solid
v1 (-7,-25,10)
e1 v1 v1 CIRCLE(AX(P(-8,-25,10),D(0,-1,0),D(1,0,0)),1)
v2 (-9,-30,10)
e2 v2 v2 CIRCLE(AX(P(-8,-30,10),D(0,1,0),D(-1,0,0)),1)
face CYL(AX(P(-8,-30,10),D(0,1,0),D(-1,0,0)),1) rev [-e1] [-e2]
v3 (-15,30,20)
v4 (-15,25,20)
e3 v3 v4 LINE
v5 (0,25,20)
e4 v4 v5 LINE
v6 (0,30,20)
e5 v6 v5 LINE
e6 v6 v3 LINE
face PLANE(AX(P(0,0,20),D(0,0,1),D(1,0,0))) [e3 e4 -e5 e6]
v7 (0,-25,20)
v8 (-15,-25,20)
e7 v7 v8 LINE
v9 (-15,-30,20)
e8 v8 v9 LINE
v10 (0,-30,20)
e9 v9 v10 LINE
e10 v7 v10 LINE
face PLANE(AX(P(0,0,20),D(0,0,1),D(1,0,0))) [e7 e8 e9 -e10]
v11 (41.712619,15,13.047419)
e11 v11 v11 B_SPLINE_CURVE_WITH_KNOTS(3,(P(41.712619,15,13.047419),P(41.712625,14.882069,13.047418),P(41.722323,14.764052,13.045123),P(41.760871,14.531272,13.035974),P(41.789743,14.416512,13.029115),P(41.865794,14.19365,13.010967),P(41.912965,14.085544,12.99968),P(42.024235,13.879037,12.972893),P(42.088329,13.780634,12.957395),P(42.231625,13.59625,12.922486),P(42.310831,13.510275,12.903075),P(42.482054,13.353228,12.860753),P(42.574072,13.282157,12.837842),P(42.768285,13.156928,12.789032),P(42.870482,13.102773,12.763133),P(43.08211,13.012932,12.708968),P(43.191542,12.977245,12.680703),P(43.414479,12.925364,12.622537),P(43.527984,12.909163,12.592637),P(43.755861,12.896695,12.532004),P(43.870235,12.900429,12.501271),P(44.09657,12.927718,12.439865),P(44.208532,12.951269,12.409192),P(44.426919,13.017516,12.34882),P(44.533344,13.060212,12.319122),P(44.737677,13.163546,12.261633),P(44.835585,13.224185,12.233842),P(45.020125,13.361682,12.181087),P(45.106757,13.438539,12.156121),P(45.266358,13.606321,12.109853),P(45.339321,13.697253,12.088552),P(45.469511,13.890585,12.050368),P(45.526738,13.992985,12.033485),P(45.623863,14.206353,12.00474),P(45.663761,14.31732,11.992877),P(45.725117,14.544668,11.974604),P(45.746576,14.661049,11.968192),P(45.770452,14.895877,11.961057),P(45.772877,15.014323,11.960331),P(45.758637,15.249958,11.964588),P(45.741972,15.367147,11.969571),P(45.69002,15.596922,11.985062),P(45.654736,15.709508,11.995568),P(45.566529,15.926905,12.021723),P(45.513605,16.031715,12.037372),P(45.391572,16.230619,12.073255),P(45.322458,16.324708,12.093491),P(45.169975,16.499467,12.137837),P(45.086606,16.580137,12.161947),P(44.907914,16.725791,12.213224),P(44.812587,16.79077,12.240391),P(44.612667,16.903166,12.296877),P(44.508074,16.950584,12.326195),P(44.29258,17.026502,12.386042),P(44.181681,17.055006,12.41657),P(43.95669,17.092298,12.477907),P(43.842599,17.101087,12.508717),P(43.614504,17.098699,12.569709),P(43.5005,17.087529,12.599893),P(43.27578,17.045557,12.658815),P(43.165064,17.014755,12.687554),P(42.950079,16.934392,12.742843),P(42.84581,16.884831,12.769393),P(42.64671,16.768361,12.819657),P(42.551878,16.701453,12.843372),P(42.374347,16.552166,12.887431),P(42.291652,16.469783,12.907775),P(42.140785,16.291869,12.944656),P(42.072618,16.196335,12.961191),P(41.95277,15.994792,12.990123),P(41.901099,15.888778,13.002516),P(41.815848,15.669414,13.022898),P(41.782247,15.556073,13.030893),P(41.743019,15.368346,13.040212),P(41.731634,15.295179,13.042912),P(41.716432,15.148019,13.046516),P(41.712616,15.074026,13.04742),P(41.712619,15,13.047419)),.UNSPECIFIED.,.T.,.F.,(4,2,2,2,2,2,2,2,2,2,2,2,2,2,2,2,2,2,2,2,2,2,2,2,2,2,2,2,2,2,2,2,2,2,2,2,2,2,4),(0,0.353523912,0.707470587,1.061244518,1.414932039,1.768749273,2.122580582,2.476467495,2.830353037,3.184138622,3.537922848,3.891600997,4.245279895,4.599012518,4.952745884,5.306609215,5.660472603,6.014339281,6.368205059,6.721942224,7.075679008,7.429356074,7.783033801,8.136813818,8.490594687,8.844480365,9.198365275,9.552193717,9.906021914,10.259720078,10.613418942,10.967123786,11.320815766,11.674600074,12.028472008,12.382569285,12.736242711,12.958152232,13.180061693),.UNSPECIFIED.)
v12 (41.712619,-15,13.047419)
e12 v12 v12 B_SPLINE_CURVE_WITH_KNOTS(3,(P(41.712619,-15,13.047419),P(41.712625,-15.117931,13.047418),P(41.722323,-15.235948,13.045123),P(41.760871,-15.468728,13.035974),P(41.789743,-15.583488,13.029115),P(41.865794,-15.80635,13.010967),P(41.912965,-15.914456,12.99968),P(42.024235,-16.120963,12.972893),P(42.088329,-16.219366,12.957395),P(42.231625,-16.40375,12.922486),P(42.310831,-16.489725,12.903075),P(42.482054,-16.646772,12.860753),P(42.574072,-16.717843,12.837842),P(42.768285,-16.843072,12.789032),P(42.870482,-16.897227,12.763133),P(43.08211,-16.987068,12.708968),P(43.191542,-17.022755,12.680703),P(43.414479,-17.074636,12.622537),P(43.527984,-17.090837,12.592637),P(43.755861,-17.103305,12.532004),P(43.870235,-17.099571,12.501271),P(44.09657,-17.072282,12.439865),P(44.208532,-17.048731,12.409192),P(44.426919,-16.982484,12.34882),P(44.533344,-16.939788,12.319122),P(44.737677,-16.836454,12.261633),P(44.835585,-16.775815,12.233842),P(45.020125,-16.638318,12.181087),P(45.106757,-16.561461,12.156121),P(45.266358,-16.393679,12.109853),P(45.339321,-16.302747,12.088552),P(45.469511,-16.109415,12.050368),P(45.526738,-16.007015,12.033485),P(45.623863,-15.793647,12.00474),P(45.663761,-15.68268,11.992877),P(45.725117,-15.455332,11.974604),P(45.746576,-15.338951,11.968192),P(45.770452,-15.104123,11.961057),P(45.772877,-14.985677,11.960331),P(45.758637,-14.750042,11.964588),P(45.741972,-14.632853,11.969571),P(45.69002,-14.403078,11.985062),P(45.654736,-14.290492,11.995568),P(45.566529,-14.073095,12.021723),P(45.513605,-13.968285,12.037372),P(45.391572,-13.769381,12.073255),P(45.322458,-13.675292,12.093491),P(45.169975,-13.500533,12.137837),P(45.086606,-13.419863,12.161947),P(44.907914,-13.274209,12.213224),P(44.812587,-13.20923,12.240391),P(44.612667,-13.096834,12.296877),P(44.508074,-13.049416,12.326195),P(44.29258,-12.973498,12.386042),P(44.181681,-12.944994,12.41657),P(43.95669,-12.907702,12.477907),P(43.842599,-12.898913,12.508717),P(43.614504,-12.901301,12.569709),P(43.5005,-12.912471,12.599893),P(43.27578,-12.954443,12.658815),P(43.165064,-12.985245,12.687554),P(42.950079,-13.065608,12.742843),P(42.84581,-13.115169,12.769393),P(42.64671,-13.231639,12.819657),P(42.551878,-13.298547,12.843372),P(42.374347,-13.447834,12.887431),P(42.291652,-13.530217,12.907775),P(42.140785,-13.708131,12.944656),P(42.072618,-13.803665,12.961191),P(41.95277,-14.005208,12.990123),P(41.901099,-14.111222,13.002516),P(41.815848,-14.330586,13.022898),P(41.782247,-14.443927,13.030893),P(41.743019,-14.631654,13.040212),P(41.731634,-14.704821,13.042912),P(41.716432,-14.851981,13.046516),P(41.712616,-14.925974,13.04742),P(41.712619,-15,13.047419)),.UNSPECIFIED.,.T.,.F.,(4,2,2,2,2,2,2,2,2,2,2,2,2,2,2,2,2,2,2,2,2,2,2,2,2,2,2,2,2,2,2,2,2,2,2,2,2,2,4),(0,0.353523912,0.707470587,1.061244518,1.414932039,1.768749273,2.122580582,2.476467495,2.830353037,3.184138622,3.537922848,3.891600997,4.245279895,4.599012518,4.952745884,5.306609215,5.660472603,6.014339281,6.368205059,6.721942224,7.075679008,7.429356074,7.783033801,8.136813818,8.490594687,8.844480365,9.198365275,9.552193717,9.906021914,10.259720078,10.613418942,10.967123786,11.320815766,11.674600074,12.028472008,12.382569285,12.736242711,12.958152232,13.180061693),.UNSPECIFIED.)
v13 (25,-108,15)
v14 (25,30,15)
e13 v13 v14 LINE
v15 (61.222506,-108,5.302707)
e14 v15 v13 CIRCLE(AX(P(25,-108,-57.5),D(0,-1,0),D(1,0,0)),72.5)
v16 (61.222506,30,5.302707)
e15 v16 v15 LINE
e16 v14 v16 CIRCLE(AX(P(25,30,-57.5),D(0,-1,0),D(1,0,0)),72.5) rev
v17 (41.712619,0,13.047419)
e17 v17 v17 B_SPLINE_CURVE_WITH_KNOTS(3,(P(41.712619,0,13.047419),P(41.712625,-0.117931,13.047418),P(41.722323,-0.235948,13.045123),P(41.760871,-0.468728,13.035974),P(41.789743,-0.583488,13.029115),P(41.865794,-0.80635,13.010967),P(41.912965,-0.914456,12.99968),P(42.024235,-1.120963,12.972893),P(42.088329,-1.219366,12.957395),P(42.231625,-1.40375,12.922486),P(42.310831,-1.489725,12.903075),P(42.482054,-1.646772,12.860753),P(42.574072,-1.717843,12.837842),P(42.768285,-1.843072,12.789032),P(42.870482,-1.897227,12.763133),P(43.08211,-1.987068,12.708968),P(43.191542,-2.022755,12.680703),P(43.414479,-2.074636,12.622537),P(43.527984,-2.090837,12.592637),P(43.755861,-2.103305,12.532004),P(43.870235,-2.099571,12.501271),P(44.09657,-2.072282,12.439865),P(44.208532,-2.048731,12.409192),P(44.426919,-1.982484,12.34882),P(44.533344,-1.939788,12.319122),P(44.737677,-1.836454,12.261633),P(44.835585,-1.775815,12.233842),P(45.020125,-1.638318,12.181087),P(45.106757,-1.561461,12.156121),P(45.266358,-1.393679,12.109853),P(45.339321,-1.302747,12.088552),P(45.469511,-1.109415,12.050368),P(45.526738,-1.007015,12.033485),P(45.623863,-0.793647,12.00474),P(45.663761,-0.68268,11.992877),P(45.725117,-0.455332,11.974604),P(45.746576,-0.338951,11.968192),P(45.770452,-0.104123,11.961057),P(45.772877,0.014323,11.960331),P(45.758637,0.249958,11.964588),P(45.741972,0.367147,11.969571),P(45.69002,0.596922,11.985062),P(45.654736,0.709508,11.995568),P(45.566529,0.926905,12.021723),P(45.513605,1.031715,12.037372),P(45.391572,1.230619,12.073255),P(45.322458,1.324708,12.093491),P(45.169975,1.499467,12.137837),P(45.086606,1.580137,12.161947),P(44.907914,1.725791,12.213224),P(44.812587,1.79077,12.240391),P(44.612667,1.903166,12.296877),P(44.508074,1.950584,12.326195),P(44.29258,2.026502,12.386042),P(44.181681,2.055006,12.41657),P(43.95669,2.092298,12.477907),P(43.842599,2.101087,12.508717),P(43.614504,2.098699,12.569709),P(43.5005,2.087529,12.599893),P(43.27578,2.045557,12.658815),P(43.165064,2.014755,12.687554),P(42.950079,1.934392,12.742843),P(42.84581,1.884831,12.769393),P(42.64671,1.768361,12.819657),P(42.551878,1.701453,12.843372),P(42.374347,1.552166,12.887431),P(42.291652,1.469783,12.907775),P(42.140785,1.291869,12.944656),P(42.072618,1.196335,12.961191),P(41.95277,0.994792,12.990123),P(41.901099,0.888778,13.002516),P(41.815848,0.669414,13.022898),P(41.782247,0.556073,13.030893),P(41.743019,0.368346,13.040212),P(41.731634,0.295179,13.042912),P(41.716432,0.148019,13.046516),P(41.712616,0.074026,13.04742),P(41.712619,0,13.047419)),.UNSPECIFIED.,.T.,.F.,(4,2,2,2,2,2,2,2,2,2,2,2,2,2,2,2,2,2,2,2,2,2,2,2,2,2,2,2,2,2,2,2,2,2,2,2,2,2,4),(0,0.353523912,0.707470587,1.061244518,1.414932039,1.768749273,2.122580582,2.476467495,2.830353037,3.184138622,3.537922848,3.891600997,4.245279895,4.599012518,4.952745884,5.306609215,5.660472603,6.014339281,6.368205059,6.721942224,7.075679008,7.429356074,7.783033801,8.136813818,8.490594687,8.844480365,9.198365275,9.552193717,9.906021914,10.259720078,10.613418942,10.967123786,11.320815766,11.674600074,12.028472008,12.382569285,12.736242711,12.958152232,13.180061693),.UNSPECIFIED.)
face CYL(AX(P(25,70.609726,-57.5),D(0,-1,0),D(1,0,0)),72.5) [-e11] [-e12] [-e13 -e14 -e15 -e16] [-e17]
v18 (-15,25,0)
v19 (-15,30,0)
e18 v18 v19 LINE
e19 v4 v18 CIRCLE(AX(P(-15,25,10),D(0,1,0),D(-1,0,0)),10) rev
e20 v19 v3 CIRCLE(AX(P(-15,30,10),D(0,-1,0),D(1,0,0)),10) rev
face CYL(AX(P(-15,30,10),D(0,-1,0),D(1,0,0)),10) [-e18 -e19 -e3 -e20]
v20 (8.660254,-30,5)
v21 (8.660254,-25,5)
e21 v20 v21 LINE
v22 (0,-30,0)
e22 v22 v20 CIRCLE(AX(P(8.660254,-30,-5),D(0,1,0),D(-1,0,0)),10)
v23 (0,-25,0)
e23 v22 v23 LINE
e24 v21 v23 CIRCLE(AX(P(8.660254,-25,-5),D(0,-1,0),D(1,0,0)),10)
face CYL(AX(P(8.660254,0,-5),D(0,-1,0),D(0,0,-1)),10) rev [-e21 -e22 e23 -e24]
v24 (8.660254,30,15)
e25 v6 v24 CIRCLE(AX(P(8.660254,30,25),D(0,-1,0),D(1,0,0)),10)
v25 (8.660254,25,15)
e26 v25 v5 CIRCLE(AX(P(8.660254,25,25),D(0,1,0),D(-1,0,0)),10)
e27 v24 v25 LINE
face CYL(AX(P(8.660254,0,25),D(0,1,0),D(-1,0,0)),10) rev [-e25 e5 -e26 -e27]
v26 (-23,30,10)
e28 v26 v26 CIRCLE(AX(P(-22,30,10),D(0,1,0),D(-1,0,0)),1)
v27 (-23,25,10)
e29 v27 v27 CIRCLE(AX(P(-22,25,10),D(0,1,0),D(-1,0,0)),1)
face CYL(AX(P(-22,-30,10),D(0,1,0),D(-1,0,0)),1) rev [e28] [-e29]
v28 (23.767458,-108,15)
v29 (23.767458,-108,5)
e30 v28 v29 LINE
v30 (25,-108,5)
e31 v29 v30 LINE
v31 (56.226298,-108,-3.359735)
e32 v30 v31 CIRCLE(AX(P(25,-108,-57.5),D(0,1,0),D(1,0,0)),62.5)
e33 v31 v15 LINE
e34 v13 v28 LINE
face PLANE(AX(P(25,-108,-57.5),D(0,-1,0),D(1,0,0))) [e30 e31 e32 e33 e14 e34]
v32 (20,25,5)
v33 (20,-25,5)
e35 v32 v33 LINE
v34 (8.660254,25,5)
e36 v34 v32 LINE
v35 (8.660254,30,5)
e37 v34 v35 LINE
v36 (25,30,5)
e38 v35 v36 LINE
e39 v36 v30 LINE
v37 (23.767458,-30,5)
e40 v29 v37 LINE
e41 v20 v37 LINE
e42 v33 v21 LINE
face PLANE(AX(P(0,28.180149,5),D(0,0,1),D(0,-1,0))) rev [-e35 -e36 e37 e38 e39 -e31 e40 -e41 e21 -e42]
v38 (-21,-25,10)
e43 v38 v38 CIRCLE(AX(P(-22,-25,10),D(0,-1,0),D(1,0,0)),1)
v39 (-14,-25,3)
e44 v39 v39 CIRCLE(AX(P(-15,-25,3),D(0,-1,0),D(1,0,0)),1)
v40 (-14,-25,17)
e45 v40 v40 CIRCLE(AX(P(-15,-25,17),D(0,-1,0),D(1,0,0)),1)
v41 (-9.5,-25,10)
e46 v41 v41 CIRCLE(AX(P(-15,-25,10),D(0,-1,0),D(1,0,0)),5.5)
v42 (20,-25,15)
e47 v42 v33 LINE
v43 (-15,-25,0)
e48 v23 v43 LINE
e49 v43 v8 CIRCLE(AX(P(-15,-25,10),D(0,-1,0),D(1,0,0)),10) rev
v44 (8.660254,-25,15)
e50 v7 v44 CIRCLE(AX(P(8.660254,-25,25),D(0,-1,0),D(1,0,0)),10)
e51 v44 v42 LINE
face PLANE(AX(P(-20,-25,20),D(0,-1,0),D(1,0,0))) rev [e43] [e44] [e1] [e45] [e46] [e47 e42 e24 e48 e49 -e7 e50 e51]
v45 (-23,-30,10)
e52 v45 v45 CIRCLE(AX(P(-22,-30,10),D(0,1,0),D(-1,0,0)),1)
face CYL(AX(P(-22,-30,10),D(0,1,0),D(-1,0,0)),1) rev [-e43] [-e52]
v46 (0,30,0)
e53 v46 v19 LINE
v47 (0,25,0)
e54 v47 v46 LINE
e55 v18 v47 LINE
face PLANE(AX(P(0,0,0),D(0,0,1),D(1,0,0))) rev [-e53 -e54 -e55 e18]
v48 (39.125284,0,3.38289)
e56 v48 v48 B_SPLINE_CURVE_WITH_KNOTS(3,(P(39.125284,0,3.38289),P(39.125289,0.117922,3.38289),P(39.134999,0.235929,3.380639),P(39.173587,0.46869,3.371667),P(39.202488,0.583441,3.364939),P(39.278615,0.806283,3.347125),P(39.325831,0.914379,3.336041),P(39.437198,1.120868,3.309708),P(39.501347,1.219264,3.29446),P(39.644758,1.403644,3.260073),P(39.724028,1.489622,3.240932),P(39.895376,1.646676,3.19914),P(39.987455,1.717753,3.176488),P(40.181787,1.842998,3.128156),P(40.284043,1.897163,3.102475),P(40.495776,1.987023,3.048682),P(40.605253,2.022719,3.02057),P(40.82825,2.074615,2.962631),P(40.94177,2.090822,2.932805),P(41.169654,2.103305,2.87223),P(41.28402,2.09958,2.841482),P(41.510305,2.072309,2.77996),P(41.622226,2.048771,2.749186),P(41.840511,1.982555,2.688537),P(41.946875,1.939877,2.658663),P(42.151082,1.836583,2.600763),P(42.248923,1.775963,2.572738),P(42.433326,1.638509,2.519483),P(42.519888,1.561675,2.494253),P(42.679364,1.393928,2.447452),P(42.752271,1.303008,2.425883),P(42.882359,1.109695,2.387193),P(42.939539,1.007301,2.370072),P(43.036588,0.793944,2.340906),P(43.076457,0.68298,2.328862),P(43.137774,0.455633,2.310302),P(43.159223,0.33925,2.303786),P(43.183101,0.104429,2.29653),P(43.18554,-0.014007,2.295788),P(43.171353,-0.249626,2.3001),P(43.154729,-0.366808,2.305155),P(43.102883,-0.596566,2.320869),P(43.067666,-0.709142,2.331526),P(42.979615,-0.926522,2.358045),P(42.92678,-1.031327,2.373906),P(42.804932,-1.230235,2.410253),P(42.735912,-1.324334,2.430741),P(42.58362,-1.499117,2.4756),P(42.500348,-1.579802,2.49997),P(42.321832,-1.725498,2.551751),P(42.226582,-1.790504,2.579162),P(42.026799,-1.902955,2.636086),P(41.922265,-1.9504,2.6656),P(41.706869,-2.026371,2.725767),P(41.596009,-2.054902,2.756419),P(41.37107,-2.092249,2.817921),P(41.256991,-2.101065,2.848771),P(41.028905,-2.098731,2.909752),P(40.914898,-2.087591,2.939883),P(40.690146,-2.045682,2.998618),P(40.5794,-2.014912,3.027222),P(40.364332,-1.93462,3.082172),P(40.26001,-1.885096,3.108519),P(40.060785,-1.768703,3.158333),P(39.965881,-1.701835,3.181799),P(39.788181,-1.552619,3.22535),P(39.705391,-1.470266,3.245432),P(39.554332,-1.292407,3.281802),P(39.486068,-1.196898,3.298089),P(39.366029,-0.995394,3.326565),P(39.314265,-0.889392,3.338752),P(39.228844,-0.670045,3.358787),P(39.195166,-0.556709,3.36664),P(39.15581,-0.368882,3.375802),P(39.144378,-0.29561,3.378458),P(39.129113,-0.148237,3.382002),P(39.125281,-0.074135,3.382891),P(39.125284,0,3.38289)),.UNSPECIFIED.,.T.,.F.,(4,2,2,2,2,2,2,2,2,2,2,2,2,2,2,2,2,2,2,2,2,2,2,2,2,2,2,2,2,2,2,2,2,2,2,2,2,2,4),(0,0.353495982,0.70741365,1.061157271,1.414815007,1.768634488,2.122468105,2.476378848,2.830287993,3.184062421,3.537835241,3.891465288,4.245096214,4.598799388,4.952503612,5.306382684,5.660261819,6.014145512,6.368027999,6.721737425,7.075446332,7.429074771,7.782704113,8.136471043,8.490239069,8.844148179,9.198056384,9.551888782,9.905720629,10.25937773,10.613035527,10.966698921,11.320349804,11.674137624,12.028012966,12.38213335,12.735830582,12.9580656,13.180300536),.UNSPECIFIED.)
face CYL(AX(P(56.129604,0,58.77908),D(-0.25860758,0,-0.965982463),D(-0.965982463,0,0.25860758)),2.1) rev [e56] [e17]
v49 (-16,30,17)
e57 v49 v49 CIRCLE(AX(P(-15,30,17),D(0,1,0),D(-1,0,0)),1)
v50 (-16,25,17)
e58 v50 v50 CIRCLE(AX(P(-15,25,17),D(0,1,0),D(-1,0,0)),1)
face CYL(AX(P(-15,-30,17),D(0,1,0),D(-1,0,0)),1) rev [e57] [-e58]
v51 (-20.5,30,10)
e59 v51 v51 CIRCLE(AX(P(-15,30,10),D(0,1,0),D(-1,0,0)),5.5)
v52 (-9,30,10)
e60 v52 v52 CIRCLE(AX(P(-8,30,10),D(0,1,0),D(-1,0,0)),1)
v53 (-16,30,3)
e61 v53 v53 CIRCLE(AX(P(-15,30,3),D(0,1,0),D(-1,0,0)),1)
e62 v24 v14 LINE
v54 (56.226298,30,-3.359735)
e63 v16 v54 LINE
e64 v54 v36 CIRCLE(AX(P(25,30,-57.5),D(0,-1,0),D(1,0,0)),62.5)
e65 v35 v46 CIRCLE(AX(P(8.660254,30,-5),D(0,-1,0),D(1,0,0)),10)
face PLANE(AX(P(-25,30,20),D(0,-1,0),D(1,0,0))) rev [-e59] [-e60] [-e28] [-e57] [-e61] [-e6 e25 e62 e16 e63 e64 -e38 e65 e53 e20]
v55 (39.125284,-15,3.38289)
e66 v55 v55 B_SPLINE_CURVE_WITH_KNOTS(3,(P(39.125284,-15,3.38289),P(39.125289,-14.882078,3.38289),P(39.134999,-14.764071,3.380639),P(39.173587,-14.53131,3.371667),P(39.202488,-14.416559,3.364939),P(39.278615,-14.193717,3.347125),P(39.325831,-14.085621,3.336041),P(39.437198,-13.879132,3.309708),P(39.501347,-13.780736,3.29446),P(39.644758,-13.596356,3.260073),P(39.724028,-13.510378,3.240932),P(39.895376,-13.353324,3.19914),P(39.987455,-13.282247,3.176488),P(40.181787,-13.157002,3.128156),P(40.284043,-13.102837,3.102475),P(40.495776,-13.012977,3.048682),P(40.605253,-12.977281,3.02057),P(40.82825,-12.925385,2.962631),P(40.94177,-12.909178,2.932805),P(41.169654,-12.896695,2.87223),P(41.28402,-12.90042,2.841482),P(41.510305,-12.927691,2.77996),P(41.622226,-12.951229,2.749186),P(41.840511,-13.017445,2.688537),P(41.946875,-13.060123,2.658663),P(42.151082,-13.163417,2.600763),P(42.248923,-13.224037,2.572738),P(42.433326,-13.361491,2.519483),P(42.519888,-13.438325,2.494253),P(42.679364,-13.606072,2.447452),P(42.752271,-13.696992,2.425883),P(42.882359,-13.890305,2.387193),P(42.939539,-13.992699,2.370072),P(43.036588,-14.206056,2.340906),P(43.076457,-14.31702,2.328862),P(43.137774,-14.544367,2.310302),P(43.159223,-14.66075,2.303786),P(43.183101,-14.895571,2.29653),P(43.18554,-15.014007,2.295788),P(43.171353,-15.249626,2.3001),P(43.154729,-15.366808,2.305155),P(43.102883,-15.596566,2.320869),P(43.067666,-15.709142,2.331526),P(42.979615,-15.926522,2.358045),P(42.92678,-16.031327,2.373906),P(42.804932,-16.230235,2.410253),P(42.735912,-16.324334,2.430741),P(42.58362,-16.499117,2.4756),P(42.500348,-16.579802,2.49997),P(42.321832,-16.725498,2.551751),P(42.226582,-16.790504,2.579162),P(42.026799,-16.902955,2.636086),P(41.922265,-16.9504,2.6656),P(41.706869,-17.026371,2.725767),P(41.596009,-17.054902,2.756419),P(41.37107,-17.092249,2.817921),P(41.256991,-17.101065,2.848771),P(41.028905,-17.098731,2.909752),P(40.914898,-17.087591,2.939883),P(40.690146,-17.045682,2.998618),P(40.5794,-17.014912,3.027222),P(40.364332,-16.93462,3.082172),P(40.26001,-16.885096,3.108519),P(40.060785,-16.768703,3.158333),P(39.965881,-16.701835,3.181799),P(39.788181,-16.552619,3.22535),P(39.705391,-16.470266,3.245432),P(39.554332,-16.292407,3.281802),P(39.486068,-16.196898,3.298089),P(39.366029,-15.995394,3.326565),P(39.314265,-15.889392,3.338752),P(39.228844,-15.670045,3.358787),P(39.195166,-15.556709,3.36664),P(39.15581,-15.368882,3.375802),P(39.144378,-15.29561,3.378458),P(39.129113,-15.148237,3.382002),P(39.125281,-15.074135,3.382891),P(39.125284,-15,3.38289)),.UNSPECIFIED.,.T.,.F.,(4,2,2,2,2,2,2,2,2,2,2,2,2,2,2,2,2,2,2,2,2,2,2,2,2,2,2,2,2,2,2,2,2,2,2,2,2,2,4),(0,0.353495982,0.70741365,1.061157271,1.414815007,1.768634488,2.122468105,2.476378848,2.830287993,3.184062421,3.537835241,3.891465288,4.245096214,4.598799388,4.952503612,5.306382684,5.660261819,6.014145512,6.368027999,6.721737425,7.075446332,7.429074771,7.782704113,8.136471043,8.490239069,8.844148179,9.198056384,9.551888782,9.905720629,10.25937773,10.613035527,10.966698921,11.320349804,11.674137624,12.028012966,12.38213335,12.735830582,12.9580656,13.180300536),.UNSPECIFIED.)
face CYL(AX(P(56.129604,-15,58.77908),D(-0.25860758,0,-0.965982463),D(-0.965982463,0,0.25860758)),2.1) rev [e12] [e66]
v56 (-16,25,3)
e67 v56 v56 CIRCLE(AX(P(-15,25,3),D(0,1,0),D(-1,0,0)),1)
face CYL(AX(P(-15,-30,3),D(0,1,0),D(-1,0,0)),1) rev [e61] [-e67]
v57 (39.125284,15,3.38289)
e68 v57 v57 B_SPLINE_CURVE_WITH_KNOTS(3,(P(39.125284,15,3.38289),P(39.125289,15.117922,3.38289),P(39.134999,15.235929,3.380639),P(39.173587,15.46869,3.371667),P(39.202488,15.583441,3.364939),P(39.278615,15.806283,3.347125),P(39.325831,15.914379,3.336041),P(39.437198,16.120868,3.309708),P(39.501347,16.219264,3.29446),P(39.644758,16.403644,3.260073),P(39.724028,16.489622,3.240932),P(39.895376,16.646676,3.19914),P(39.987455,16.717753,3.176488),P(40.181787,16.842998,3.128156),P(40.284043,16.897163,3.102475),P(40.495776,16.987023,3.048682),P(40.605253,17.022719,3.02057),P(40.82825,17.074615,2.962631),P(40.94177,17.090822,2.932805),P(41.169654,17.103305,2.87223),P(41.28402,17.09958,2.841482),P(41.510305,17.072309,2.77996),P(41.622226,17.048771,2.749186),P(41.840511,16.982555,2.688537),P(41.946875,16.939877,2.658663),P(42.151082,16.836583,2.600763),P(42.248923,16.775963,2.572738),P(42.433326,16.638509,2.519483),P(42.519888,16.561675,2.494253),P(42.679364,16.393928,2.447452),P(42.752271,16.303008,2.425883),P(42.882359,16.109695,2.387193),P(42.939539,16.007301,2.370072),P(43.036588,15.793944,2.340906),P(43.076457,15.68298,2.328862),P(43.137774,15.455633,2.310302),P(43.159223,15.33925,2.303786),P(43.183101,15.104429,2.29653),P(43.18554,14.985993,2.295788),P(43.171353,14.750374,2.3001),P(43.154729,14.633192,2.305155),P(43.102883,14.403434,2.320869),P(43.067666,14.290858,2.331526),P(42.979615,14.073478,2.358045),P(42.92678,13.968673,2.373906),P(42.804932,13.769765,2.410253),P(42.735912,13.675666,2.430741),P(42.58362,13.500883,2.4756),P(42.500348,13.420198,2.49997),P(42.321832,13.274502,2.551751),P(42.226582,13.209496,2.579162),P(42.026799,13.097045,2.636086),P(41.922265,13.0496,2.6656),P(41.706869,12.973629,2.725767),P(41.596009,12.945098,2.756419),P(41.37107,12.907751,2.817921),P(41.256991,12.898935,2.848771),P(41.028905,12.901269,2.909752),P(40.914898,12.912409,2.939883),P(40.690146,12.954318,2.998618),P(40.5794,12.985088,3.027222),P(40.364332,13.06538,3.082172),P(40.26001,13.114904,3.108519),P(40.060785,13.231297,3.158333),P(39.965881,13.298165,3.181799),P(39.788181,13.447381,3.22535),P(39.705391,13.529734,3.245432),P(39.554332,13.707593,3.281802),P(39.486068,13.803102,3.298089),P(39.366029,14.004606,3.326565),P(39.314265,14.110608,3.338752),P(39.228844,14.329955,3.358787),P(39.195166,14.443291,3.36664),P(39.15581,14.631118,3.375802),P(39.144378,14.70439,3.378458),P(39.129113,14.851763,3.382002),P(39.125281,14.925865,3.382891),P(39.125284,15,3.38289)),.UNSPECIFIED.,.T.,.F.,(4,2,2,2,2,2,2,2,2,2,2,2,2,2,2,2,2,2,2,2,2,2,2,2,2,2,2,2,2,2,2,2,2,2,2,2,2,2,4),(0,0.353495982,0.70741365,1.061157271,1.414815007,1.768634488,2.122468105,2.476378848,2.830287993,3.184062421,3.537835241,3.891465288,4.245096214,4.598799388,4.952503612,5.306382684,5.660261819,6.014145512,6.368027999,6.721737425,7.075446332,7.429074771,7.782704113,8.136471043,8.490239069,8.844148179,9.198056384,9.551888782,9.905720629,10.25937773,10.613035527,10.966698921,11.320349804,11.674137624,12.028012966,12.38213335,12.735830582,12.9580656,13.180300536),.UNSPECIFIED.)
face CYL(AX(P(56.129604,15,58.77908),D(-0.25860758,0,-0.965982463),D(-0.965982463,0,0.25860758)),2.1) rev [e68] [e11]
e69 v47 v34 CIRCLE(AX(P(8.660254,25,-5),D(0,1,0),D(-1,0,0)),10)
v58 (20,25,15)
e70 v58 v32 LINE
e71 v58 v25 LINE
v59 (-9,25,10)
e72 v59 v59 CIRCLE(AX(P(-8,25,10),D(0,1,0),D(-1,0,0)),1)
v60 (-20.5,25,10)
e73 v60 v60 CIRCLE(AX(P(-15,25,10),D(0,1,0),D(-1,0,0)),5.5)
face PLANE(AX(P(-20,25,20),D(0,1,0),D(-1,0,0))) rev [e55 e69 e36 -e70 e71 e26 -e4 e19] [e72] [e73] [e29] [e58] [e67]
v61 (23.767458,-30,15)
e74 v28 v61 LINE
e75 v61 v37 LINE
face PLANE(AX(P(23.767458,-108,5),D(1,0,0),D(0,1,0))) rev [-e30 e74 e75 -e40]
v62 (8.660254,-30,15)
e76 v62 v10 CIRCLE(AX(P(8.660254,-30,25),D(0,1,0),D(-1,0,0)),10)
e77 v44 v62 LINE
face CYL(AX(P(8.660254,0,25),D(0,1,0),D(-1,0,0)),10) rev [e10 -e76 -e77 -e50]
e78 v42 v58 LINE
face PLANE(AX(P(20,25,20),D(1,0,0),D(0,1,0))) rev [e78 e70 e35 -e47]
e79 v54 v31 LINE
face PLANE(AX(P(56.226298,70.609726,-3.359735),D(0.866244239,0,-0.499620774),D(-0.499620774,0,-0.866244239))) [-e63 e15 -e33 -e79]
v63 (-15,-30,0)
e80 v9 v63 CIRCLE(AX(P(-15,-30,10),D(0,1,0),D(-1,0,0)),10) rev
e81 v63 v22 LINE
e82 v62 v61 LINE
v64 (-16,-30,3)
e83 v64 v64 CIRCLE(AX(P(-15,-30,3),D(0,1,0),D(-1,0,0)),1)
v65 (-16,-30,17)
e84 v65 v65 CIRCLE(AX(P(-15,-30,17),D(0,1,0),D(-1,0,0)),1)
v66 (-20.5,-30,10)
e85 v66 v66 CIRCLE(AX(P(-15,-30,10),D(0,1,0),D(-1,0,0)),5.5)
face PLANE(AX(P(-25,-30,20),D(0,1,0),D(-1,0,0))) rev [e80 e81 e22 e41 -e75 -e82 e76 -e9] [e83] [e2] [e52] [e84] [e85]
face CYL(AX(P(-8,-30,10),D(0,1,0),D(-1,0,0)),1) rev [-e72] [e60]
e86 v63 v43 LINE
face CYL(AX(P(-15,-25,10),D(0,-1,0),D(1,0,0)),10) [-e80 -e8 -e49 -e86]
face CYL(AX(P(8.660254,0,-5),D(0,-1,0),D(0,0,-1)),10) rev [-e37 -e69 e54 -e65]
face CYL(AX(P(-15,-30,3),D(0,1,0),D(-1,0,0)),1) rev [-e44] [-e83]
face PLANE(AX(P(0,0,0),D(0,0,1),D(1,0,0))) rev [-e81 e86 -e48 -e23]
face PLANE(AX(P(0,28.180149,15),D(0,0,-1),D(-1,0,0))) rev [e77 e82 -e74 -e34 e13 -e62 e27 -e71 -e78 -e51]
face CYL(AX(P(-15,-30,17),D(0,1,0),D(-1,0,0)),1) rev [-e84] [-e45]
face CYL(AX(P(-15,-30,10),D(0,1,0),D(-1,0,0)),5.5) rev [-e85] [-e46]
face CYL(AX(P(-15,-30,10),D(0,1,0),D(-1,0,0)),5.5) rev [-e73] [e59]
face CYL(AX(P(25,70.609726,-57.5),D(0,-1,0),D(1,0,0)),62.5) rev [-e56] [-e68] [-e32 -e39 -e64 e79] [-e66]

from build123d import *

# Parameters (mm, degrees)
BOSS_EXTRUDE2_DEPTH = 20
FILLET1_RADIUS      = 10
FILLET1_LENGTH      = 5
FILLET2_RADIUS      = 10
FILLET2_LENGTH      = 5
SKETCH5_R           = 1
SKETCH5_R_2         = 5.5
CUT_EXTRUDE5_DEPTH  = 69.007352544
CUT_EXTRUDE7_DEPTH  = 25
FILLET5_R           = 10
BOSS_EXTRUDE5_DEPTH = 60
SKETCH13_R          = 2.1
CUT_EXTRUDE8_DEPTH  = 60
BOSS_EXTRUDE6_START = 78
BOSS_EXTRUDE6_DEPTH = 78


with BuildPart() as part:
    # Sketch1 → Boss-Extrude2 (new body)
    with BuildSketch(Plane.XY):
        Polygon((-25, 30), (25, 30), (25, -30), (-25, -30), (-25, -25), (-20, -25), (20, -25), (20, 25), (-20, 25), (-25, 25), align=None)
    extrude(amount=BOSS_EXTRUDE2_DEPTH)

    # Fillet1: full round fillet: the end face becomes a half cylinder, R = half its width
    fillet1_face = Plane((-25, 27.5, 10), x_dir=(0, -1, 0), z_dir=(-1, 0, 0))  # on the end face: x along it, z out of the body
    fillet1_slab = fillet1_face.offset(-FILLET1_RADIUS / 2) * Box(FILLET1_LENGTH, 2 * FILLET1_RADIUS, FILLET1_RADIUS, mode=Mode.PRIVATE)  # the body's end, R deep
    fillet1_round = Plane((-15, 27.5, 10), x_dir=(-1, 0, 0), z_dir=(0, -1, 0)) * Cylinder(FILLET1_RADIUS, FILLET1_LENGTH, mode=Mode.PRIVATE)  # its axis R under the face
    add(fillet1_slab - fillet1_round, mode=Mode.SUBTRACT)

    # Fillet2: full round fillet: the end face becomes a half cylinder, R = half its width
    fillet2_face = Plane((-25, -27.5, 10), x_dir=(0, -1, 0), z_dir=(-1, 0, 0))  # on the end face: x along it, z out of the body
    fillet2_slab = fillet2_face.offset(-FILLET2_RADIUS / 2) * Box(FILLET2_LENGTH, 2 * FILLET2_RADIUS, FILLET2_RADIUS, mode=Mode.PRIVATE)  # the body's end, R deep
    fillet2_round = Plane((-15, -27.5, 10), x_dir=(-1, 0, 0), z_dir=(0, -1, 0)) * Cylinder(FILLET2_RADIUS, FILLET2_LENGTH, mode=Mode.PRIVATE)  # its axis R under the face
    add(fillet2_slab - fillet2_round, mode=Mode.SUBTRACT)

    # Sketch5 → Cut-Extrude5 (cut, through all)
    with BuildSketch(Plane(origin=(0, 30, 0), x_dir=(1, 0, 0), z_dir=(0, 1, 0))):
        with Locations(Location((-15, -3, 0), (0, 0, 180))):
            Circle(SKETCH5_R)
        with Locations(Location((-22, -10, 0), (0, 0, 180))):
            Circle(SKETCH5_R)
        with Locations(Location((-15, -17, 0), (0, 0, 180))):
            Circle(SKETCH5_R)
        with Locations(Location((-8, -10, 0), (0, 0, 180))):
            Circle(SKETCH5_R)
        with Locations(Location((-15, -10, 0), (0, 0, 180))):
            Circle(SKETCH5_R_2)
    extrude(amount=-CUT_EXTRUDE5_DEPTH, mode=Mode.SUBTRACT)

    # Sketch10 → Cut-Extrude7 (cut)
    with BuildSketch(Plane(origin=(25, 0, 0), x_dir=(0, 0, -1), z_dir=(1, 0, 0))):
        Polygon((-15, 28.180148829), (-15, -28.180148829), (-15, -30), (-20, -30), (-20, 30), (-15, 30), align=None)
        Polygon((-5, 28.180148829), (-5, -28.180148829), (-5, -30), (0, -30), (0, 30), (-5, 30), align=None)
    extrude(amount=-CUT_EXTRUDE7_DEPTH, mode=Mode.SUBTRACT)

    # Fillet5
    # the kernel refuses this fillet: 10 mm, written as the material it adds along each edge
    with BuildSketch(Plane(origin=(0, 25, 15), x_dir=(1, 0, 0), z_dir=(0, 1, 0)), Plane(origin=(0, -30, 15), x_dir=(1, 0, 0), z_dir=(0, 1, 0)), Plane(origin=(0, -25, 5), x_dir=(1, 0, 0), z_dir=(0, -1, 0))) as fillet5_piece_1:
        with BuildLine():
            CenterArc((8.660254038, -10), FILLET5_R, 90, 60)
            Line((0, -5), (-0.173205081, -4.9))
            ThreePointArc((-0.173205081, -4.9), (-0.2, -2.5), (-0.2, 0))
            Line((-0.2, 0), (0, 0.2))
            Line((0, 0.2), (8.660254038, 0.2))
            Line((8.660254038, 0.2), (8.660254038, 0))
        make_face()
    extrude(amount=5)
    with BuildSketch(Plane(origin=(0, 30, 5), x_dir=(0, 0, -1), z_dir=(0, -1, 0))) as fillet5_piece_2:
        with BuildLine():
            CenterArc((10, 8.660254038), FILLET5_R, 180, 60)
            Line((0, 8.660254038), (-0.2, 8.660254038))
            Line((-0.2, 8.660254038), (-0.2, 0))
            Line((-0.2, 0), (0, -0.2))
            ThreePointArc((0, -0.2), (2.5, -0.2), (4.9, -0.173205081))
            Line((4.9, -0.173205081), (5, 0))
        make_face()
    extrude(amount=5)

    # Sketch12 → Boss-Extrude5 (add)
    with BuildSketch(Plane.XZ.offset(30)):
        with BuildLine():
            Line((56.226298398, -3.359735054), (61.222506141, 5.302707337))
            ThreePointArc((61.222506141, 5.302707337), (43.74904955, 12.533728595), (25, 15))
            Line((25, 15), (25, 5))
            ThreePointArc((25, 5), (41.16297375, 2.873903962), (56.226298398, -3.359735054))
        make_face()
    extrude(amount=-BOSS_EXTRUDE5_DEPTH)

    # Sketch13 → Cut-Extrude8 (cut)
    with BuildSketch(Plane(origin=(2.920998947, 0, 10.910870277), x_dir=(-0.9659824633840055, 0, 0.2586075800021504), z_dir=(-0.2586075800021504, 0, -0.9659824633840055))):
        with Locations((-39.019497435, 15)):
            Circle(SKETCH13_R)
        with Locations((-39.019497435, 0)):
            Circle(SKETCH13_R)
        with Locations((-39.019497435, -15)):
            Circle(SKETCH13_R)
    extrude(amount=-CUT_EXTRUDE8_DEPTH, mode=Mode.SUBTRACT)

    # Sketch14 → Boss-Extrude6 (add)
    with BuildSketch(Plane.XZ.offset(30).offset(BOSS_EXTRUDE6_START)):
        with BuildLine():
            Line((61.222506141, 5.302707337), (56.226298398, -3.359735054))
            ThreePointArc((56.226298398, -3.359735054), (41.16297375, 2.873903962), (25, 5))
            Line((25, 5), (23.767457853, 5))
            Line((23.767457853, 5), (23.767457853, 15))
            Line((23.767457853, 15), (25, 15))
            ThreePointArc((25, 15), (43.74904955, 12.533728595), (61.222506141, 5.302707337))
        make_face()
    extrude(amount=-BOSS_EXTRUDE6_DEPTH)


solid = part.part
